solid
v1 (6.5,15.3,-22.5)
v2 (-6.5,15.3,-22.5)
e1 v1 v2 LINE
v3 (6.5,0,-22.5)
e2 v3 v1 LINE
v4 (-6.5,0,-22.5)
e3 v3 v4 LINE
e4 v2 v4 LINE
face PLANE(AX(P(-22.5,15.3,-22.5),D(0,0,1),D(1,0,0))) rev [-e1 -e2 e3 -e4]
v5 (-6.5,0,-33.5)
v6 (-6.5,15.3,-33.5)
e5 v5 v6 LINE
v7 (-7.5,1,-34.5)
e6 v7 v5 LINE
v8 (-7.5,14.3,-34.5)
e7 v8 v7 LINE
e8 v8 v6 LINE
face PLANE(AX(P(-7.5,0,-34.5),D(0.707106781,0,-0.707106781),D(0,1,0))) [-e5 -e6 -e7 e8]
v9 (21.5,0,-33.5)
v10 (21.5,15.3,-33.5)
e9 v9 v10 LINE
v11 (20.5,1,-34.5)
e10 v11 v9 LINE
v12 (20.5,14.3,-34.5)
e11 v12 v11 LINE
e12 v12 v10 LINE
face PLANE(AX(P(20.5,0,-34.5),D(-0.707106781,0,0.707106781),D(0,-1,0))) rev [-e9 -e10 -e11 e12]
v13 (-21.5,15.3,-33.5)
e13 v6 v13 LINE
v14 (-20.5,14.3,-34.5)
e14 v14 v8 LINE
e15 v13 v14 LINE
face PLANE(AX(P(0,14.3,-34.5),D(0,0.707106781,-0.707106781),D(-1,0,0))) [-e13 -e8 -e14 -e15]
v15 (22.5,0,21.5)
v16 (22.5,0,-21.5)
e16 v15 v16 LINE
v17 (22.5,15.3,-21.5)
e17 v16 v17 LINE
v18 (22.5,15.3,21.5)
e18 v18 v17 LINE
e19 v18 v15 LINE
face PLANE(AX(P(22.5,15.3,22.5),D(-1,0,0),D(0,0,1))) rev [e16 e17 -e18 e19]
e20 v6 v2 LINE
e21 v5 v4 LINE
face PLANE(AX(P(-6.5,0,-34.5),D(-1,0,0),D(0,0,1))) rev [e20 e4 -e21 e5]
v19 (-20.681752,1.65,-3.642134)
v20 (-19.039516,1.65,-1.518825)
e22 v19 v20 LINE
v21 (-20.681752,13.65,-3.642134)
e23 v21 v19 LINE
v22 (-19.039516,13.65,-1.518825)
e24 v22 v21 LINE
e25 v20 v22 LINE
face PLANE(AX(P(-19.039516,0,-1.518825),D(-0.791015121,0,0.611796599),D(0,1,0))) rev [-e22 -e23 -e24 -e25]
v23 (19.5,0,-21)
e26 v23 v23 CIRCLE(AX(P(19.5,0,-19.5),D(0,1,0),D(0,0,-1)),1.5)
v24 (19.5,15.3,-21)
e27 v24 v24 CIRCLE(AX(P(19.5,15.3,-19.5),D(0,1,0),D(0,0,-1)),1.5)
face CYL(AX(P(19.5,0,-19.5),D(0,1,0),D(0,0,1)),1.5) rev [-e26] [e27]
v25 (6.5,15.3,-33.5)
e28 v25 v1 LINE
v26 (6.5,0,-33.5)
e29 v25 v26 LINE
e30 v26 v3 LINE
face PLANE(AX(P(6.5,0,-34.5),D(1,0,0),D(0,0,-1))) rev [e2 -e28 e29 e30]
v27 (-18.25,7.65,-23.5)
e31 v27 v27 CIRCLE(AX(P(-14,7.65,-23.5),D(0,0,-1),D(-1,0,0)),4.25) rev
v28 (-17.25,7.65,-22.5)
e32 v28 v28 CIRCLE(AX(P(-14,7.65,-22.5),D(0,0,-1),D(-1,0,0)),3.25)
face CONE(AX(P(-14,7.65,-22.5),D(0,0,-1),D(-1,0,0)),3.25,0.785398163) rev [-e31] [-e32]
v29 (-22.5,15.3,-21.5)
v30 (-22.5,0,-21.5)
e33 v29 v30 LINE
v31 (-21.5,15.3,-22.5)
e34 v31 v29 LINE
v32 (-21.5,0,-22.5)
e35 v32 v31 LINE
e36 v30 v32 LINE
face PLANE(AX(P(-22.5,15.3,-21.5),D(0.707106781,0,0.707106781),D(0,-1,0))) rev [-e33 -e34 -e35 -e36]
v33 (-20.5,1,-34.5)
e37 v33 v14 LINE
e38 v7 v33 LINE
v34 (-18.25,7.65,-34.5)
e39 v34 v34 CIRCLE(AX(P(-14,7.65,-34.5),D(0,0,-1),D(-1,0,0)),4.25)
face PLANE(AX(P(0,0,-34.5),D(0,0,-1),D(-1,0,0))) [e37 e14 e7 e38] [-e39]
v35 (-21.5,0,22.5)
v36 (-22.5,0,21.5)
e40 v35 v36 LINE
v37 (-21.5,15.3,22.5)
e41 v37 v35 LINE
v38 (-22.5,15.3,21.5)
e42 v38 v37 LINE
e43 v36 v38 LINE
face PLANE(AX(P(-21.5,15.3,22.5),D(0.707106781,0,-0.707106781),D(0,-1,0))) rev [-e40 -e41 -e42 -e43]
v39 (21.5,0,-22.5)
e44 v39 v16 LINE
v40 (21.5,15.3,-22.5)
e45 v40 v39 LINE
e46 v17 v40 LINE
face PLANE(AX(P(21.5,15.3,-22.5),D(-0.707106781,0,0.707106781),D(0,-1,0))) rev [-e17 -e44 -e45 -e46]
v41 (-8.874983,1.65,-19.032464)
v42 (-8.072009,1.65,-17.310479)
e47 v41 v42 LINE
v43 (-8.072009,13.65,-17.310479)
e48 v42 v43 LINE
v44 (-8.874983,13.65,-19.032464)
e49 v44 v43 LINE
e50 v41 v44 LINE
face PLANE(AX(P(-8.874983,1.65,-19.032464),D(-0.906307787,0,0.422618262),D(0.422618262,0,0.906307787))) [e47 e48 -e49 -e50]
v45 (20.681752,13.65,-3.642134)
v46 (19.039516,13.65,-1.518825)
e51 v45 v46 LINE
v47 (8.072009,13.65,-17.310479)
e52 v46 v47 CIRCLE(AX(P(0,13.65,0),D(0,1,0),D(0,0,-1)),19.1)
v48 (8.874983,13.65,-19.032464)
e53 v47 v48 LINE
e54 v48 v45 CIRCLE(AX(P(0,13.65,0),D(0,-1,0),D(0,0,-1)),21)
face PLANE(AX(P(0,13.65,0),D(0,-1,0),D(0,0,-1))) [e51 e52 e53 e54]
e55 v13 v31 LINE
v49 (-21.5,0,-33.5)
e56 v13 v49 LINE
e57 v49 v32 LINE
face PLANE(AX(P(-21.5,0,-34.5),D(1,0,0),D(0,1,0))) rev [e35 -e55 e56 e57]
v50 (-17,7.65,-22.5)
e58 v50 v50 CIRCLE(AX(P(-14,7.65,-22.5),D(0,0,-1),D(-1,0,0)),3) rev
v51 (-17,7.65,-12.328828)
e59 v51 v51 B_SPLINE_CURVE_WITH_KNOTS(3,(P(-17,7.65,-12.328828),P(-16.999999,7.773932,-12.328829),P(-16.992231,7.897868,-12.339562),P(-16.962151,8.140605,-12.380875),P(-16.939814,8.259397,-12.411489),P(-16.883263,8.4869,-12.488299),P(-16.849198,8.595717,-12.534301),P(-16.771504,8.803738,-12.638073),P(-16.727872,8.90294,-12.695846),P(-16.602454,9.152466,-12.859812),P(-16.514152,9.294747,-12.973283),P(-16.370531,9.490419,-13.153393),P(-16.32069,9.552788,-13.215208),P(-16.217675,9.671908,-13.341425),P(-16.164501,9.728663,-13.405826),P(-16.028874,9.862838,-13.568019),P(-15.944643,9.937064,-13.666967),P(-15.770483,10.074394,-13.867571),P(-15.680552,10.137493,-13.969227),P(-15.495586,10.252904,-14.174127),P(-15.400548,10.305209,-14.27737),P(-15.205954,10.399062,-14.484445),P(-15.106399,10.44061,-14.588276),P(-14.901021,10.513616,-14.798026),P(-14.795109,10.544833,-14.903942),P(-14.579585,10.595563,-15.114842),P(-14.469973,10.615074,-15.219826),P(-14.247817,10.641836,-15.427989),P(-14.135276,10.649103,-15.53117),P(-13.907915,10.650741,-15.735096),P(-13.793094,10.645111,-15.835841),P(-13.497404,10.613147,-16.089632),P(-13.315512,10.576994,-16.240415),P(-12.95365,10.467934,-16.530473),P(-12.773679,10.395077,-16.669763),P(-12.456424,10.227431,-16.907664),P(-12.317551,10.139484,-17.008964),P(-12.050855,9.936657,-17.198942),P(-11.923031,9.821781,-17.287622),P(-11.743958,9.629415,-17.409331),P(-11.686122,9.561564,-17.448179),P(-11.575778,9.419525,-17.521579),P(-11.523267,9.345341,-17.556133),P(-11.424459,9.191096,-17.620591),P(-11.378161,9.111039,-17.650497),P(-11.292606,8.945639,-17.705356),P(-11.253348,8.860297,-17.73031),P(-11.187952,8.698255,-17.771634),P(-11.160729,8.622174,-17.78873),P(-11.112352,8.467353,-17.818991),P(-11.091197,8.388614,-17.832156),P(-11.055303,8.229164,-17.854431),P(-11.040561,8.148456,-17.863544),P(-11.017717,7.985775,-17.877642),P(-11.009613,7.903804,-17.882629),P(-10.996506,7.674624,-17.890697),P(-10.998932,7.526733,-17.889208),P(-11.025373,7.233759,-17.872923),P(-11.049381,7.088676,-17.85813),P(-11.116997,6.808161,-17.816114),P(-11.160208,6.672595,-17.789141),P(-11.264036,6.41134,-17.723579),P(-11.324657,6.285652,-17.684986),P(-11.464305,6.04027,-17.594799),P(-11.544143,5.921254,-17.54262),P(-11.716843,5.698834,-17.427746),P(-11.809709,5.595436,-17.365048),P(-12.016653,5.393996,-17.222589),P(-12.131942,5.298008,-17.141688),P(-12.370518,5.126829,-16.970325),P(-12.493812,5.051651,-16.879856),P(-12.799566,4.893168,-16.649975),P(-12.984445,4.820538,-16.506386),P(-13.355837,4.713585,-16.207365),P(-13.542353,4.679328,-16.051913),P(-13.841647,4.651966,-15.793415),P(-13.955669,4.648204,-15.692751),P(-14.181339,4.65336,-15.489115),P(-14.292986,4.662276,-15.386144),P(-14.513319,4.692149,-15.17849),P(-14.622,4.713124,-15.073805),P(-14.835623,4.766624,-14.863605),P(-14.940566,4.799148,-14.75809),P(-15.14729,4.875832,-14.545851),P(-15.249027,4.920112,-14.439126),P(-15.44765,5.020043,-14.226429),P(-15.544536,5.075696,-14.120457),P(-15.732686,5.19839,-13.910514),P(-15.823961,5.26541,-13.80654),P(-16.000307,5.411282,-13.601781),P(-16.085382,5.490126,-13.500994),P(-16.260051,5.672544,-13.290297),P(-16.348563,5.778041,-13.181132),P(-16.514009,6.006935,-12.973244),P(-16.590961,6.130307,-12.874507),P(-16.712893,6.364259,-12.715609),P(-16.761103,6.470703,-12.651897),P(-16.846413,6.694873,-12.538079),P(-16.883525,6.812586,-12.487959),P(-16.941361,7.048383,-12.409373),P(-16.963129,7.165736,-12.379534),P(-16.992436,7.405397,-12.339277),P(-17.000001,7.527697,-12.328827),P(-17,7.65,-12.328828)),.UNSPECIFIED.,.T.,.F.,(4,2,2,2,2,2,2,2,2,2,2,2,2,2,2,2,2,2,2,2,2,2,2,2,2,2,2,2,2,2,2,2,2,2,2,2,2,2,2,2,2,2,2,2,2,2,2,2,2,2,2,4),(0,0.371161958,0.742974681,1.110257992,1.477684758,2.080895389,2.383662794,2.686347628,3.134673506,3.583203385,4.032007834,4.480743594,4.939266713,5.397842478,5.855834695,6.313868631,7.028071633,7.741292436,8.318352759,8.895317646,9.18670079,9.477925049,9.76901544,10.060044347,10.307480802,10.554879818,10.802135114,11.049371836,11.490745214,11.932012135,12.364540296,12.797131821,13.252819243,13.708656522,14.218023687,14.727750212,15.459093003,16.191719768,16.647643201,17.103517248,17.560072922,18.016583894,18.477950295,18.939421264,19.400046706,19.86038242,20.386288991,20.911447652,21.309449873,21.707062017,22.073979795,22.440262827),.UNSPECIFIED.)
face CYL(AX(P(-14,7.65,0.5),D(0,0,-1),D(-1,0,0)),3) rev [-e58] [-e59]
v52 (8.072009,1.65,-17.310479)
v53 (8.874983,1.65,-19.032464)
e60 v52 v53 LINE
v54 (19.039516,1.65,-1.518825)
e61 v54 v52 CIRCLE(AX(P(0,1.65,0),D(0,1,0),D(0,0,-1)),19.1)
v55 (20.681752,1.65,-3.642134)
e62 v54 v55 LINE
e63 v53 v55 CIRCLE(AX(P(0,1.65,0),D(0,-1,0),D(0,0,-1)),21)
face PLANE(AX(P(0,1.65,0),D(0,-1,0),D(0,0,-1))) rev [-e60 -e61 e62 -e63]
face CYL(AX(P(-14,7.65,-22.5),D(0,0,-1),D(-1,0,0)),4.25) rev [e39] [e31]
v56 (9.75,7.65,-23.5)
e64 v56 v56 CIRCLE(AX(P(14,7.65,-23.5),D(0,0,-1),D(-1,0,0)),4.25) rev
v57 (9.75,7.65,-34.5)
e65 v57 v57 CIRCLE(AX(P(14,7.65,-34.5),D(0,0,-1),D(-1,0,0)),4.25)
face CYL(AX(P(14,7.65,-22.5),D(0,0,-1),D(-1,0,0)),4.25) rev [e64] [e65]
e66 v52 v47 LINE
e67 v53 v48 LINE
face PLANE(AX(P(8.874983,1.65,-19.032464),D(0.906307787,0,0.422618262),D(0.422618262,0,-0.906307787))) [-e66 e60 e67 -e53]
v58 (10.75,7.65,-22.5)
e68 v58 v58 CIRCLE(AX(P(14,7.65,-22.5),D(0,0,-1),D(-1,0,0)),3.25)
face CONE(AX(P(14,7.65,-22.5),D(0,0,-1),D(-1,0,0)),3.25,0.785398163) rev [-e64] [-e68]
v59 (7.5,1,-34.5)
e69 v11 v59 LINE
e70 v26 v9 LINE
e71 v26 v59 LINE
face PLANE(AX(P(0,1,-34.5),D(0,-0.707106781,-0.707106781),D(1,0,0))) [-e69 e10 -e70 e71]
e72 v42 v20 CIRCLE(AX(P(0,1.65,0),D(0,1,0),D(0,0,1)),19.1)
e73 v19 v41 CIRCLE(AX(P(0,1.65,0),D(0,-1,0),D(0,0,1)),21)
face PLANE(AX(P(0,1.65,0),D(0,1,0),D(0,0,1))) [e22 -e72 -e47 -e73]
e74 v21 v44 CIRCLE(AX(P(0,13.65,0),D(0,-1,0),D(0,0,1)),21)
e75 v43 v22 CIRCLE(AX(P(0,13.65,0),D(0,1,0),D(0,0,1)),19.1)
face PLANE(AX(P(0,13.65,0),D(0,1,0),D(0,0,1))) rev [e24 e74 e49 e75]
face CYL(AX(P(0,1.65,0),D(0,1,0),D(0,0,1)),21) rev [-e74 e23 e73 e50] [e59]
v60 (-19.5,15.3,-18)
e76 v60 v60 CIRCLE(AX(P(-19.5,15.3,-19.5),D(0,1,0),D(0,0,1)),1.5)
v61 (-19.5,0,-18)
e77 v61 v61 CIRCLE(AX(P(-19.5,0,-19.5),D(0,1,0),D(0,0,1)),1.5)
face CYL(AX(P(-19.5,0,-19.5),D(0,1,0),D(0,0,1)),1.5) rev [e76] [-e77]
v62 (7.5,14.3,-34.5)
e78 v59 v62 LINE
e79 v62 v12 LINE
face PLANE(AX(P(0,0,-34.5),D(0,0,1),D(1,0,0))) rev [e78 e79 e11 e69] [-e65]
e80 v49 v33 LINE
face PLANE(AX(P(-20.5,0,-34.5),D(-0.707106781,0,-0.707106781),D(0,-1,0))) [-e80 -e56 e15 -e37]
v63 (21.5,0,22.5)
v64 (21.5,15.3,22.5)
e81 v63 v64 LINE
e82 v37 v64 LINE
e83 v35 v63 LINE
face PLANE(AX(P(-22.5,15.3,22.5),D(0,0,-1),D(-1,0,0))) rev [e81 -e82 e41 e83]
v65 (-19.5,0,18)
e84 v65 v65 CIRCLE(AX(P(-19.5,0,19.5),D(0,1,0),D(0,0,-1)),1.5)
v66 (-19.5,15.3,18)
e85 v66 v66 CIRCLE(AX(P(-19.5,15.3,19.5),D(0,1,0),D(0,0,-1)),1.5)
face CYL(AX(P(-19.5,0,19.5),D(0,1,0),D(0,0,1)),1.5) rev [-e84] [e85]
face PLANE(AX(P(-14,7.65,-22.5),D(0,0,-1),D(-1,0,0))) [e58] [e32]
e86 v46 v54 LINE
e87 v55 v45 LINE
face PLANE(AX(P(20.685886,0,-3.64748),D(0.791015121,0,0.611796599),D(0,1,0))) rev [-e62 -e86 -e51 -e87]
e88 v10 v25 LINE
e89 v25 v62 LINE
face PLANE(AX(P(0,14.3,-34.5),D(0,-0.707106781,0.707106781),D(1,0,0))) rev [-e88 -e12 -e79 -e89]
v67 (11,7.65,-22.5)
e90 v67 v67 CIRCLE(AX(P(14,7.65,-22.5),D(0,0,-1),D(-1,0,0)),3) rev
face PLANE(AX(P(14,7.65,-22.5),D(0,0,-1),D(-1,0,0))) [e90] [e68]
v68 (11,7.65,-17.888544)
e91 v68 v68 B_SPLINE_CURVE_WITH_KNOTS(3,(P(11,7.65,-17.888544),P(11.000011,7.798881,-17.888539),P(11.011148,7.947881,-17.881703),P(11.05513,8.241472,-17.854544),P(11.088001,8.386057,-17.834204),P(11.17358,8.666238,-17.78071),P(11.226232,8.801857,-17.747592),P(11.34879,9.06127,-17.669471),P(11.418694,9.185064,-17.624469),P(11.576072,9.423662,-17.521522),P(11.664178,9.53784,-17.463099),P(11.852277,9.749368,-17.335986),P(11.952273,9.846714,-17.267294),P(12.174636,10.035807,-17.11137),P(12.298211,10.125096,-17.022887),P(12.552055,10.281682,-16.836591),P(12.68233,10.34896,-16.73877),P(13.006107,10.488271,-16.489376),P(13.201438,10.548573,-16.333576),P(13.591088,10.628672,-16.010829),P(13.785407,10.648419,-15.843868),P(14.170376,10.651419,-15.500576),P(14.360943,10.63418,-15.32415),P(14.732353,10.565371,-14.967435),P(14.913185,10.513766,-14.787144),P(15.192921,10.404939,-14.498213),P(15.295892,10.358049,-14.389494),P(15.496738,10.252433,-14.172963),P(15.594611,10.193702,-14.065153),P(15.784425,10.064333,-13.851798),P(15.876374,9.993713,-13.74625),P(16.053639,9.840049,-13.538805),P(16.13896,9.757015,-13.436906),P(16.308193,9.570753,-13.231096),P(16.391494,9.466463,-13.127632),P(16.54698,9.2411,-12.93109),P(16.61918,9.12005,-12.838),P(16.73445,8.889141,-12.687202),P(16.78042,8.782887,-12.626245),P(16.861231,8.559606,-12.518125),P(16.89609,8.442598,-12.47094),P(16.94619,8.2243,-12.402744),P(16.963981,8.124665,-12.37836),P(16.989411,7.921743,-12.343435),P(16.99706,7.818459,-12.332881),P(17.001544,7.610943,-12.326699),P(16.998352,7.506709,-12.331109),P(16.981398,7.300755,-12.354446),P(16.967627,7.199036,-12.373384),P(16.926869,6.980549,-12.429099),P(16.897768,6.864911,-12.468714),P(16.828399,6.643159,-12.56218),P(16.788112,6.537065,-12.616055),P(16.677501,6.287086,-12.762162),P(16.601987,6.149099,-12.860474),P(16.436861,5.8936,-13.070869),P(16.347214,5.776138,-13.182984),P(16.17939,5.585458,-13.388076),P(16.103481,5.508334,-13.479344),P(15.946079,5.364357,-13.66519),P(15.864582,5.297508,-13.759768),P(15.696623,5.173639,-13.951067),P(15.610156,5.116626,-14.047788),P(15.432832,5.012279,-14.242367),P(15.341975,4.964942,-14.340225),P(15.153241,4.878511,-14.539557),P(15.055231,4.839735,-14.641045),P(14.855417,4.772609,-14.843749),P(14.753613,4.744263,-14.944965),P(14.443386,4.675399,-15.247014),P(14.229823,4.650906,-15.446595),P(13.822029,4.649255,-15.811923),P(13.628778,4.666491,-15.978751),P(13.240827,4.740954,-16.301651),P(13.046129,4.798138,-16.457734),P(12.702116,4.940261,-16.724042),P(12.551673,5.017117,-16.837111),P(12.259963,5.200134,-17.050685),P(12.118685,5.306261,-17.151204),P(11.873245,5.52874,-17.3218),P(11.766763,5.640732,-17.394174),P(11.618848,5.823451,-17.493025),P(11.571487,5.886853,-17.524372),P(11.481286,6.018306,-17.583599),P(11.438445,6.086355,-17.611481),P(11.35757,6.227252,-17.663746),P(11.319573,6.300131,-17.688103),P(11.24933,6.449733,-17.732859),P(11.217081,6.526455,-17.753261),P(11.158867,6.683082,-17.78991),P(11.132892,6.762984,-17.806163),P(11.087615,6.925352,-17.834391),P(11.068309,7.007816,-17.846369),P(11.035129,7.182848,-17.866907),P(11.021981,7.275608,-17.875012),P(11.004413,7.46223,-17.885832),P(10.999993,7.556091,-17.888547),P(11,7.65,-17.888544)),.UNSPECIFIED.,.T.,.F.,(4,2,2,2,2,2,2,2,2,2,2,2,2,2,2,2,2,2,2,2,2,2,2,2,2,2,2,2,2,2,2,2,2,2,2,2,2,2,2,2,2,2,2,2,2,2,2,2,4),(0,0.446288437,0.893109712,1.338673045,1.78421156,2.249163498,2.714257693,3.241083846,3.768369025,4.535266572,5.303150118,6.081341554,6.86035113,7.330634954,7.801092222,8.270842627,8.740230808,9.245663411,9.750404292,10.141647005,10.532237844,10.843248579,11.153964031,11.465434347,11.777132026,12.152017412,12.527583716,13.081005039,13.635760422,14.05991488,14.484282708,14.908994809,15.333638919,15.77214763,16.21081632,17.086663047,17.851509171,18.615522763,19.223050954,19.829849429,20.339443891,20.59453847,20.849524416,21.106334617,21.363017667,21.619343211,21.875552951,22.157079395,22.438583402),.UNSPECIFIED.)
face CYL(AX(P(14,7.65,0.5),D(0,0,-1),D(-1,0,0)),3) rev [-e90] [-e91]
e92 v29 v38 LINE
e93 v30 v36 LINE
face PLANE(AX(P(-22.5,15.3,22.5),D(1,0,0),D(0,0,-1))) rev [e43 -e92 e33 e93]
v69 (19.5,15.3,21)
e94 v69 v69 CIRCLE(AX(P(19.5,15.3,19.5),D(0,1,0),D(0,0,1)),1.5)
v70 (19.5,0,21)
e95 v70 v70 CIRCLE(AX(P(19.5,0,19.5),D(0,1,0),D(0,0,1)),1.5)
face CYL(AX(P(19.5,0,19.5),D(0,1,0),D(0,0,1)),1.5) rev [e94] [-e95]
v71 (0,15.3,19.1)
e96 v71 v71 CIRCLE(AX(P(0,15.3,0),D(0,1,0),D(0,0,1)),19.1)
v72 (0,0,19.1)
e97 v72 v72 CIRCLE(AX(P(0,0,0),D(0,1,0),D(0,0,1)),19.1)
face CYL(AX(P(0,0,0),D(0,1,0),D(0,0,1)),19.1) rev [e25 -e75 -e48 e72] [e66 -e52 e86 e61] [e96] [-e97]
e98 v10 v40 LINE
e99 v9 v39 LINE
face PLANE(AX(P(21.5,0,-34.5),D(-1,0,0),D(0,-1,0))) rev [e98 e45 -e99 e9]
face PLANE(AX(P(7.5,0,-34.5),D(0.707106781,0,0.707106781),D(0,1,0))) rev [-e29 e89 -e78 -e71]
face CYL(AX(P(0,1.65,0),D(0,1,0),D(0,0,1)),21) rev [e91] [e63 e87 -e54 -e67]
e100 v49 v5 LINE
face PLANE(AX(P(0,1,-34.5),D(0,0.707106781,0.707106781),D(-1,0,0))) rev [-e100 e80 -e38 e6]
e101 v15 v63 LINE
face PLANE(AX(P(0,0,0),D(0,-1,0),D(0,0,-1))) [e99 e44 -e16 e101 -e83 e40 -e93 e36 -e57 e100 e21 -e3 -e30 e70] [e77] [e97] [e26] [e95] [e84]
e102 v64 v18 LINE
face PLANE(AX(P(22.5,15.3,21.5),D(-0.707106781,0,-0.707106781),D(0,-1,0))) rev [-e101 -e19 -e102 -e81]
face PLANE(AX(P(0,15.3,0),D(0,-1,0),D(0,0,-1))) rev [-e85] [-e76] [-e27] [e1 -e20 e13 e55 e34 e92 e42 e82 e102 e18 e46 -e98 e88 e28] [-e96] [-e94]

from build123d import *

# Parameters (mm, degrees)
SKETCH_1_W               = 45
SKETCH_1_H               = 45
EXTRUDE_1_DEPTH          = 15.3
SKETCH_2_R               = 19.1
CUT_EXTRUDE_1_DEPTH      = 36.307081443
SKETCH_5_W               = 15
SKETCH_5_H               = 15.3
EXTRUDE_2_DEPTH          = 12
SKETCH_6_R               = 3
CUT_EXTRUDE_4_DEPTH      = 35
SKETCH_7_R               = 1.5
CUT_EXTRUDE_5_DEPTH      = 44.938479832
CUT_EXTRUDE_6_DEPTH      = 6
CUT_EXTRUDE_6_DEPTH_BACK = 6
SKETCH_9_R               = 4.25
CUT_EXTRUDE_7_DEPTH      = 12
CHAMFER_2_SIZE           = 1
CHAMFER_3_SIZE           = 1
CHAMFER_4_SIZE           = 1


# Some blends are built 0.0001 mm under size
with BuildPart() as part:
    # 草图1 → 凸台-拉伸1 (new body)
    with BuildSketch(Plane(origin=(0, 0, 0), x_dir=(1, 0, 0), z_dir=(0, 1, 0))):
        Rectangle(SKETCH_1_W, SKETCH_1_H)
    extrude(amount=EXTRUDE_1_DEPTH)

    # 草图2 → 切除-拉伸1 (cut, through all)
    with BuildSketch(Plane(origin=(0, 15.3, 0), x_dir=(1, 0, 0), z_dir=(0, 1, 0))):
        with Locations(Location((0, 0, 0), (0, 0, 270))):
            Circle(SKETCH_2_R)
    extrude(amount=-CUT_EXTRUDE_1_DEPTH, mode=Mode.SUBTRACT)

    # 草图5 → 凸台-拉伸2 (add)
    with BuildSketch(Plane(origin=(0, 0, -22.5), x_dir=(-1, 0, 0), z_dir=(0, 0, -1))):
        with Locations((14, 7.65)):
            Rectangle(SKETCH_5_W, SKETCH_5_H)
        with Locations((-14, 7.65)):
            Rectangle(SKETCH_5_W, SKETCH_5_H)
    extrude(amount=EXTRUDE_2_DEPTH)

    # 草图6 → 切除-拉伸4 (cut)
    with BuildSketch(Plane(origin=(0, 0, -34.5), x_dir=(-1, 0, 0), z_dir=(0, 0, -1))):
        with Locations((-14, 7.65)):
            Circle(SKETCH_6_R)
        with Locations((14, 7.65)):
            Circle(SKETCH_6_R)
    extrude(amount=-CUT_EXTRUDE_4_DEPTH, mode=Mode.SUBTRACT)

    # 草图7 → 切除-拉伸5 (cut, through all)
    with BuildSketch(Plane(origin=(0, 15.3, 0), x_dir=(1, 0, 0), z_dir=(0, 1, 0))):
        with Locations(Location((-19.5, 19.5, 0), (0, 0, 270))):
            Circle(SKETCH_7_R)
        with Locations(Location((19.5, 19.5, 0), (0, 0, 90))):
            Circle(SKETCH_7_R)
        with Locations(Location((19.5, -19.5, 0), (0, 0, 270))):
            Circle(SKETCH_7_R)
        with Locations(Location((-19.5, -19.5, 0), (0, 0, 90))):
            Circle(SKETCH_7_R)
    extrude(amount=-CUT_EXTRUDE_5_DEPTH, mode=Mode.SUBTRACT)

    # 草图8 → 切除-拉伸6 (cut, two sides: drawn at the far end of the back side and taken through both)
    with BuildSketch(Plane(origin=(0, 7.65, 0), x_dir=(-1, 0, 0), z_dir=(0, -1, 0)).offset(-CUT_EXTRUDE_6_DEPTH_BACK)):
        with BuildLine():
            Line((-8.874983497, 19.032463528), (-8.072008799, 17.310478732))
            ThreePointArc((-8.072008799, 17.310478732), (-15.1530488, 11.627343294), (-18.809828083, 3.316680193))
            Line((-18.809828083, 3.316680193), (-20.680962813, 3.646611731))
            ThreePointArc((-20.680962813, 3.646611731), (-16.660420146, 12.783990009), (-8.874983497, 19.032463528))
        make_face()
        with BuildLine():
            Line((20.680962813, 3.646611731), (18.809828083, 3.316680193))
            ThreePointArc((18.809828083, 3.316680193), (15.1530488, 11.627343294), (8.072008799, 17.310478732))
            Line((8.072008799, 17.310478732), (8.874983497, 19.032463528))
            ThreePointArc((8.874983497, 19.032463528), (16.660420146, 12.783990009), (20.680962813, 3.646611731))
        make_face()
    extrude(amount=CUT_EXTRUDE_6_DEPTH + CUT_EXTRUDE_6_DEPTH_BACK, mode=Mode.SUBTRACT)

    # 草图9 → 切除-拉伸7 (cut)
    with BuildSketch(Plane(origin=(0, 0, -34.5), x_dir=(-1, 0, 0), z_dir=(0, 0, -1))):
        with Locations((-14, 7.65)):
            Circle(SKETCH_9_R)
        with Locations((14, 7.65)):
            Circle(SKETCH_9_R)
    extrude(amount=-CUT_EXTRUDE_7_DEPTH, mode=Mode.SUBTRACT)

    # 倒角1
    # the kernel refuses this chamfer: 2 mm, written as the material it takes off along each edge
    with BuildSketch(Plane(origin=(-18.809828083, 1.65, -3.316680193), x_dir=(-0.09666023054018325, 0, 0.9953174367165073), z_dir=(0, 1, 0))) as chamfer_1_piece_1_section:
        with BuildLine():
            Line((1.811638226, -0.054831322), (-0.147910468, -1.899248595))
            Line((-0.147910468, -1.899248595), (0, 0))
            ThreePointArc((0, 0), (0.933514183, -0.049753736), (1.811638226, -0.054831322))
        make_face()
    chamfer_1_piece_1 = extrude(amount=12, mode=Mode.PRIVATE)
    chamfer_1_piece_1 = chamfer_1_piece_1 & Plane(origin=(0, 7.65, 0), x_dir=(-0.42261826174070266, 0, -0.9063077870366485), z_dir=(0, 1, 0)) * Cylinder(21, 32, mode=Mode.PRIVATE)
    add(chamfer_1_piece_1, mode=Mode.SUBTRACT)
    with BuildSketch(Plane(origin=(18.809828083, 13.65, -3.316680193), x_dir=(0.09666023054018283, 0, 0.9953174367165073), z_dir=(0, -1, 0))) as chamfer_1_piece_2_section:
        with BuildLine():
            Line((1.811638226, -0.054831322), (-0.147910468, -1.899248595))
            Line((-0.147910468, -1.899248595), (0, 0))
            ThreePointArc((0, 0), (0.933514183, -0.049753736), (1.811638226, -0.054831322))
        make_face()
    chamfer_1_piece_2 = extrude(amount=12, mode=Mode.PRIVATE)
    chamfer_1_piece_2 = chamfer_1_piece_2 & Plane(origin=(0, 7.65, 0), x_dir=(0.9848077530122075, 0, -0.17364817766693397), z_dir=(0, 1, 0)) * Cylinder(21, 32, mode=Mode.PRIVATE)
    add(chamfer_1_piece_2, mode=Mode.SUBTRACT)

    # 倒角2
    chamfer_2_edges = [part.edges().sort_by_distance(p)[0] for p in [
        (22.5, 7.65, 22.5),
        (-22.5, 7.65, 22.5),
        (-22.5, 7.65, -22.5),
        (22.5, 7.65, -22.5),
    ]]
    chamfer(chamfer_2_edges, length=CHAMFER_2_SIZE - 0.0001)  # a hair under: the kernel refuses the full size

    # 倒角3
    chamfer_3_edges = [part.edges().sort_by_distance(p)[0] for p in [
        (18.25, 7.65, -22.5),
        (-9.75, 7.65, -22.5),
    ]]
    chamfer(chamfer_3_edges, length=CHAMFER_3_SIZE)

    # 倒角4
    chamfer_4_edges = [part.edges().sort_by_distance(p)[0] for p in [
        (6.5, 7.65, -34.5),
        (14, 15.3, -34.5),
        (21.5, 7.65, -34.5),
        (14, 0, -34.5),
        (-21.5, 7.65, -34.5),
        (-14, 15.3, -34.5),
        (-6.5, 7.65, -34.5),
        (-14, 0, -34.5),
    ]]
    chamfer(chamfer_4_edges, length=CHAMFER_4_SIZE)


solid = part.part
